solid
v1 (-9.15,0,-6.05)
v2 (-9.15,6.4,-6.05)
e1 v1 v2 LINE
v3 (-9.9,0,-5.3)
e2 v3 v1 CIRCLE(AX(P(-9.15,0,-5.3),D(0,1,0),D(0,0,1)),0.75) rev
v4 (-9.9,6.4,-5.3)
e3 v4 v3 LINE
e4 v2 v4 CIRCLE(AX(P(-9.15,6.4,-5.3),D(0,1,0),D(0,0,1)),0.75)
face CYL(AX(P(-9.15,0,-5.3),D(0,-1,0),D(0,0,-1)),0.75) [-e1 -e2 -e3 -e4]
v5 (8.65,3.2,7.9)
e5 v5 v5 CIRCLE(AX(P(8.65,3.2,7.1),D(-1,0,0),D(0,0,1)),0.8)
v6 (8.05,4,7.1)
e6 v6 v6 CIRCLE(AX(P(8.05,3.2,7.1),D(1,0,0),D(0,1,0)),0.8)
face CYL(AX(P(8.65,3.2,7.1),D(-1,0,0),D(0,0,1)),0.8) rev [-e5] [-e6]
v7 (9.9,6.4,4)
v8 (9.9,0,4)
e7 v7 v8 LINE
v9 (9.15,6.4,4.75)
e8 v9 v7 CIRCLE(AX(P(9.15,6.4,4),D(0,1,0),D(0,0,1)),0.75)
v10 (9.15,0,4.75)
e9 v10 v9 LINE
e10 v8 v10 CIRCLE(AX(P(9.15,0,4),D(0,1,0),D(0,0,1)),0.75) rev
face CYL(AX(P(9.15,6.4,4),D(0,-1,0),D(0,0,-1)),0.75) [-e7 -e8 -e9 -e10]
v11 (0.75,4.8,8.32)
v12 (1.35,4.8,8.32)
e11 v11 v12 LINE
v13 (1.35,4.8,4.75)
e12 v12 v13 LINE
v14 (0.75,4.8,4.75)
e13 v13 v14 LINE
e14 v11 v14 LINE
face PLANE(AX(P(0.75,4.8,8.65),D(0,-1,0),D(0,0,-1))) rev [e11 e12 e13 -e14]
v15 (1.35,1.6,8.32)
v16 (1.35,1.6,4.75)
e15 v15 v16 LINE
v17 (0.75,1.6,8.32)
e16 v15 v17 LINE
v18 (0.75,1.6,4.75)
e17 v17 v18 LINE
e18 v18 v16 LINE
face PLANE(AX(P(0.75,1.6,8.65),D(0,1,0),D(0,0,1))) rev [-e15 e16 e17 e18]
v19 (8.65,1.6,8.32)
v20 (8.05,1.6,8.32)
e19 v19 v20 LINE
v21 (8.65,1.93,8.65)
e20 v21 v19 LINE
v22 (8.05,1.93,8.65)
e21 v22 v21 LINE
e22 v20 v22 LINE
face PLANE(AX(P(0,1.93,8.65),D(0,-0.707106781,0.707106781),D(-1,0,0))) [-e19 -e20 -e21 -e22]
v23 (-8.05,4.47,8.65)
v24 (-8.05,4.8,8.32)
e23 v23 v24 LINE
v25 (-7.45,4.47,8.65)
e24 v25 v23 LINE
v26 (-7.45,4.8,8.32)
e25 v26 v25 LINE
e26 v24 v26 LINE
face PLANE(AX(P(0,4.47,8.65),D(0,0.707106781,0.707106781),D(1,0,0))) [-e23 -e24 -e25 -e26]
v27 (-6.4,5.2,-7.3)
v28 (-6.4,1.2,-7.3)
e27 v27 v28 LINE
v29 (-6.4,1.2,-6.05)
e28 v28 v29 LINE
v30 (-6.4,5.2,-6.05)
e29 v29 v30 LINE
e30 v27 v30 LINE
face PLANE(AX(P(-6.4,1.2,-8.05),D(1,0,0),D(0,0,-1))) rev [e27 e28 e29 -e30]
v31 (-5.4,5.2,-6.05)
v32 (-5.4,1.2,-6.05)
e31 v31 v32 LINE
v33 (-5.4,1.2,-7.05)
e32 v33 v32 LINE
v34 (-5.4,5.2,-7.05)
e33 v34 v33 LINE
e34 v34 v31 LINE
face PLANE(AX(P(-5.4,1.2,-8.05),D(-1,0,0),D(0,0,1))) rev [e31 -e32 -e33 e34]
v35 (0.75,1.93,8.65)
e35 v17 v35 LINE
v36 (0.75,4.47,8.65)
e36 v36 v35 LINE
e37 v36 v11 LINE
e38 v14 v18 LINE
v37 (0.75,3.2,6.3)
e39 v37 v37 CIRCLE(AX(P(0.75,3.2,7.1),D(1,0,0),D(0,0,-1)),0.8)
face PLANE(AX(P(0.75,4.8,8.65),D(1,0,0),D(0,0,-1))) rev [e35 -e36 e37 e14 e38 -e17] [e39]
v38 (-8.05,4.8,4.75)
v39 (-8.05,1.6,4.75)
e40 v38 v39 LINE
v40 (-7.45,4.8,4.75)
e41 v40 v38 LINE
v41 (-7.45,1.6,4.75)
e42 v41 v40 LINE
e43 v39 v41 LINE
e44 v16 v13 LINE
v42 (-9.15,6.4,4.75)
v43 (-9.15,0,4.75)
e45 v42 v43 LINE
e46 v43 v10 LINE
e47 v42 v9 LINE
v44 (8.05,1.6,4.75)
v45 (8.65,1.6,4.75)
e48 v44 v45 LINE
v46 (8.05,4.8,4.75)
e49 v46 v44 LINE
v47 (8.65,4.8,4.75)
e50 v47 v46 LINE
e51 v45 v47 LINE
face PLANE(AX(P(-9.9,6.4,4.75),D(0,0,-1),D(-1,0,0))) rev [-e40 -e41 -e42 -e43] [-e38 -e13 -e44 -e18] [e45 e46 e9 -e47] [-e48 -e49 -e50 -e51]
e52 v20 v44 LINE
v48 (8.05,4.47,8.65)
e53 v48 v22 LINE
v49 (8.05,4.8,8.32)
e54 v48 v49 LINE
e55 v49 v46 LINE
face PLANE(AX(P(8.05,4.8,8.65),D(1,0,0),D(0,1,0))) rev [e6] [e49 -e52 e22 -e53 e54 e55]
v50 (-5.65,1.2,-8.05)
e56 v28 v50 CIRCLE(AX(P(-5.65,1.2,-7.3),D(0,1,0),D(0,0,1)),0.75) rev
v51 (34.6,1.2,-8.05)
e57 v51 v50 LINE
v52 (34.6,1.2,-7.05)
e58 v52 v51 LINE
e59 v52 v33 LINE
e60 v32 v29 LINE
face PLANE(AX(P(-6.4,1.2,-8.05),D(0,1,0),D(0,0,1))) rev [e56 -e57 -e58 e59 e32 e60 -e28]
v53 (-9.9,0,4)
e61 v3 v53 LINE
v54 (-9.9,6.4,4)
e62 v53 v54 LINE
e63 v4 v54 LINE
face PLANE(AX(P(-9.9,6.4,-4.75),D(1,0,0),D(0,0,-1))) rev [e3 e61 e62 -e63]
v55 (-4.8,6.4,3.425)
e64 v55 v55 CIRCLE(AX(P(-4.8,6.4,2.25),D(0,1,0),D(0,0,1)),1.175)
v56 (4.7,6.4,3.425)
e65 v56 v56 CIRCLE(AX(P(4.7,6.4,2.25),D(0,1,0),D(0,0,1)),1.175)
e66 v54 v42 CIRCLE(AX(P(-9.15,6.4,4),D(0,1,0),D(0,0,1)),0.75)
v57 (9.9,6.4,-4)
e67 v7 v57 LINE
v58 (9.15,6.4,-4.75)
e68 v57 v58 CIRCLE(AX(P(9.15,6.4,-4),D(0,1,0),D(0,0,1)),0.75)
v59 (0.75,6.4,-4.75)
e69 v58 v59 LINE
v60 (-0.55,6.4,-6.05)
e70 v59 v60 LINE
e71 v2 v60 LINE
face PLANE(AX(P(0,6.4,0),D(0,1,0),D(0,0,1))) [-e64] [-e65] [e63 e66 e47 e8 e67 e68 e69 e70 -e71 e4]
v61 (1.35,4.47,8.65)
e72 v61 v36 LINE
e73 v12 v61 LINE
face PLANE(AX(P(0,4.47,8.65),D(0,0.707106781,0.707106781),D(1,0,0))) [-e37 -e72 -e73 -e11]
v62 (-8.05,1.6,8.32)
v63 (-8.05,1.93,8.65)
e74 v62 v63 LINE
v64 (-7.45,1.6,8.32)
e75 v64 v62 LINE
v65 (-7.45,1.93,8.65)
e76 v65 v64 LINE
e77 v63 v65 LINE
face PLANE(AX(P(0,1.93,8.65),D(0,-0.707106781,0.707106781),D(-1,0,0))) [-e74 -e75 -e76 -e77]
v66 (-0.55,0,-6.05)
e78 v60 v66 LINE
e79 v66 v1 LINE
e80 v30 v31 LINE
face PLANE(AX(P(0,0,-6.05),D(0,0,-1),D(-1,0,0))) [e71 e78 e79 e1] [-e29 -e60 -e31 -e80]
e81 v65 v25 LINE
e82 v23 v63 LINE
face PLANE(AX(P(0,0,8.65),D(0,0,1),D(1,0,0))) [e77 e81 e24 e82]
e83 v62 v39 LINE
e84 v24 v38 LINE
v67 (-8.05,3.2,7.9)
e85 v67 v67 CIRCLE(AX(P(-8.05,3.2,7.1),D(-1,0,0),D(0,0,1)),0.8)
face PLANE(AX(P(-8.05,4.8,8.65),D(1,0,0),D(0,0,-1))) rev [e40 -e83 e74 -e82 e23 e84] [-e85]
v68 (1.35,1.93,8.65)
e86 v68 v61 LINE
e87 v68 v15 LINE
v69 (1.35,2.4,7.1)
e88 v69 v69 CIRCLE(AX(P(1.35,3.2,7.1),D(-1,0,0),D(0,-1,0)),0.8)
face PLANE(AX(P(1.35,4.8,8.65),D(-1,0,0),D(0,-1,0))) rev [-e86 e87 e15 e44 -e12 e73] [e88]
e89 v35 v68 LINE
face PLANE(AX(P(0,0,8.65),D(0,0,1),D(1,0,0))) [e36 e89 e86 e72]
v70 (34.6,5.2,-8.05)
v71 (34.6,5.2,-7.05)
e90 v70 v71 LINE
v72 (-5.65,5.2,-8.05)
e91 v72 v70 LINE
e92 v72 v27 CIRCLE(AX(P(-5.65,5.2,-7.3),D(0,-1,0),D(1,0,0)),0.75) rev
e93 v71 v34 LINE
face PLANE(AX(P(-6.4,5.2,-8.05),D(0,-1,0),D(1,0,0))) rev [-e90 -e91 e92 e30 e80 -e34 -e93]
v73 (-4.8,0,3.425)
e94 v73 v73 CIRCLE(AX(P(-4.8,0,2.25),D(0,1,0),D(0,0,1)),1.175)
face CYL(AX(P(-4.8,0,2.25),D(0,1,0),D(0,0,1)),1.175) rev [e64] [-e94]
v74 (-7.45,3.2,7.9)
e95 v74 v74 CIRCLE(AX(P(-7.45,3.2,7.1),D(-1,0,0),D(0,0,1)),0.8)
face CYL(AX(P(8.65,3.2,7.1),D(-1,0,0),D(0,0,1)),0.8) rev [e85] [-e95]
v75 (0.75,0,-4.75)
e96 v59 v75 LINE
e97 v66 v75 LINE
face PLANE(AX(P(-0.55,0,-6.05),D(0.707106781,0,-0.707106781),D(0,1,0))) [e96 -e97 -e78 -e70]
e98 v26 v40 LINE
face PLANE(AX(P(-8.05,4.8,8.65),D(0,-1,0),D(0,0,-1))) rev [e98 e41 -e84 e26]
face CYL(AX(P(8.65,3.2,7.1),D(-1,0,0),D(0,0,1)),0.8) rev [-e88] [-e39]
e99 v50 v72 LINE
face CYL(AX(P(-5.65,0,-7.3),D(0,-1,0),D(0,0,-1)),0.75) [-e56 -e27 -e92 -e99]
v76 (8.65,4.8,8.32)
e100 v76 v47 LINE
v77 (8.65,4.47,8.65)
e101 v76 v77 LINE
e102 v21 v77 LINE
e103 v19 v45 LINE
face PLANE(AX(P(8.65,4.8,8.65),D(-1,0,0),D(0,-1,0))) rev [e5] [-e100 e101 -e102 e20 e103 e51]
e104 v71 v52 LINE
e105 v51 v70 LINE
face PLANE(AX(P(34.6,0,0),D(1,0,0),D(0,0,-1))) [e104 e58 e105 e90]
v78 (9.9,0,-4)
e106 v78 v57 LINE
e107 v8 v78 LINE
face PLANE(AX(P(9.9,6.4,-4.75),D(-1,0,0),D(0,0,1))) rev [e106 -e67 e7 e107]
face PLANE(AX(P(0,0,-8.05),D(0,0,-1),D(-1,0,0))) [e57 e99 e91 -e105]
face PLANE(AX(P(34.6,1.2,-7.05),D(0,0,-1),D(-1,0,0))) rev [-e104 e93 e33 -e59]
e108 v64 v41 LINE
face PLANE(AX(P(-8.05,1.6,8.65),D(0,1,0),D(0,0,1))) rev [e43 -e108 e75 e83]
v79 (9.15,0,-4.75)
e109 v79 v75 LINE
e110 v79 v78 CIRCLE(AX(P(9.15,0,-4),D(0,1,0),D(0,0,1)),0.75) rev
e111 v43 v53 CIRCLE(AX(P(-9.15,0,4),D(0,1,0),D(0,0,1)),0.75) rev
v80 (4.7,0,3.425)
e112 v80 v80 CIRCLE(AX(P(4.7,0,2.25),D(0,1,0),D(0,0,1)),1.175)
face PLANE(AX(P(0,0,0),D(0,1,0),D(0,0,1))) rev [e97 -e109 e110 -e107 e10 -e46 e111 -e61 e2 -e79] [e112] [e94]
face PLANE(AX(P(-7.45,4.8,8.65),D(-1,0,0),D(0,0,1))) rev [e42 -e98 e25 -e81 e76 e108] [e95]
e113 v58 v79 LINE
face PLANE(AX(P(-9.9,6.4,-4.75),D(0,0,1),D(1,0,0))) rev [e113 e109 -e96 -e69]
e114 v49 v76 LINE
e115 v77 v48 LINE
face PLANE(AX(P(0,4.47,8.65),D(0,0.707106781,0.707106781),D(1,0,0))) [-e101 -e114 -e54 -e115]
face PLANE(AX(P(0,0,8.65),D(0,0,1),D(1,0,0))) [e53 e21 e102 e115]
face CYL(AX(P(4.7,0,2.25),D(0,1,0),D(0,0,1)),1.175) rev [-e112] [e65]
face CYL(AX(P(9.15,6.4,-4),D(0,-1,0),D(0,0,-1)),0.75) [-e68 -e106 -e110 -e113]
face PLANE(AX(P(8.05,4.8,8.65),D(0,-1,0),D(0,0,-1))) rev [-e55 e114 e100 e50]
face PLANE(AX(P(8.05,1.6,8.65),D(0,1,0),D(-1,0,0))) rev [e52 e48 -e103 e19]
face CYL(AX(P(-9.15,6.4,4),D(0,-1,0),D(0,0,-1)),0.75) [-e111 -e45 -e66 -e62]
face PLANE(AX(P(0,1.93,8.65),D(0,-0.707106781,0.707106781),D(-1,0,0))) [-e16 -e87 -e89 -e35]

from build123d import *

# Parameters (mm, degrees)
SKETCH1_W           = 19.8
SKETCH1_H           = 9.5
BOSS_EXTRUDE1_DEPTH = 6.4
SKETCH2_W           = 10.65
SKETCH2_H           = 6.4
BOSS_EXTRUDE2_DEPTH = 1.3
CHAMFER3_SIZE       = 1.3
FILLET1_R           = 0.75
SKETCH3_W           = 1
SKETCH3_H           = 4
BOSS_EXTRUDE3_DEPTH = 2
SKETCH4_W           = 1
SKETCH4_H           = 4
BOSS_EXTRUDE4_DEPTH = 40
FILLET2_R           = 0.75
SKETCH5_R           = 1.175
CUT_EXTRUDE1_DEPTH  = 6.4
SKETCH6_W           = 0.6
SKETCH6_H           = 3.2
BOSS_EXTRUDE5_DEPTH = 3.9
SKETCH8_R           = 0.8
CUT_EXTRUDE2_DEPTH  = 16.7
CHAMFER4_SIZE       = 0.33


with BuildPart() as part:
    # Sketch1 → Boss-Extrude1 (new body)
    with BuildSketch(Plane(origin=(0, 0, 0), x_dir=(1, 0, 0), z_dir=(0, 1, 0))):
        Rectangle(SKETCH1_W, SKETCH1_H)
    extrude(amount=BOSS_EXTRUDE1_DEPTH)

    # Sketch2 → Boss-Extrude2 (add)
    with BuildSketch(Plane(origin=(0, 0, -4.75), x_dir=(-1, 0, 0), z_dir=(0, 0, -1))):
        with Locations((4.575, 3.2)):
            Rectangle(SKETCH2_W, SKETCH2_H)
    extrude(amount=BOSS_EXTRUDE2_DEPTH)

    # Chamfer3
    chamfer3_edges = [part.edges().sort_by_distance(p)[0] for p in [
        (0.75, 3.2, -6.05),
    ]]
    chamfer(chamfer3_edges, length=CHAMFER3_SIZE - 0.0001)  # a hair under: the kernel refuses the full size

    # Fillet1
    fillet1_edges = [part.edges().sort_by_distance(p)[0] for p in [
        (-9.9, 3.2, -6.05),
        (9.9, 3.2, 4.75),
        (-9.9, 3.2, 4.75),
        (9.9, 3.2, -4.75),
    ]]
    fillet(fillet1_edges, radius=FILLET1_R)

    # Sketch3 → Boss-Extrude3 (add)
    with BuildSketch(Plane(origin=(0, 0, -6.05), x_dir=(-1, 0, 0), z_dir=(0, 0, -1))):
        with Locations((5.9, 3.2)):
            Rectangle(SKETCH3_W, SKETCH3_H)
    extrude(amount=BOSS_EXTRUDE3_DEPTH)

    # Sketch4 → Boss-Extrude4 (add)
    with BuildSketch(Plane(origin=(-5.4, 0, 0), x_dir=(0, 0, -1), z_dir=(1, 0, 0))):
        with Locations((7.55, 3.2)):
            Rectangle(SKETCH4_W, SKETCH4_H)
    extrude(amount=BOSS_EXTRUDE4_DEPTH)

    # Fillet2
    fillet2_edges = [part.edges().sort_by_distance(p)[0] for p in [
        (-6.4, 3.2, -8.05),
    ]]
    fillet(fillet2_edges, radius=FILLET2_R)

    # Sketch5 → Cut-Extrude1 (cut)
    with BuildSketch(Plane(origin=(0, 6.4, 0), x_dir=(1, 0, 0), z_dir=(0, 1, 0))):
        with Locations(Location((-4.8, -2.25, 0), (0, 0, 270))):
            Circle(SKETCH5_R)
        with Locations(Location((4.7, -2.25, 0), (0, 0, 270))):
            Circle(SKETCH5_R)
    extrude(amount=-CUT_EXTRUDE1_DEPTH, mode=Mode.SUBTRACT)

    # Sketch6 → Boss-Extrude5 (add)
    with BuildSketch(Plane.XY.offset(4.75)):
        with Locations((-7.75, 3.2)):
            Rectangle(SKETCH6_W, SKETCH6_H)
        with Locations((1.05, 3.2)):
            Rectangle(SKETCH6_W, SKETCH6_H)
        with Locations((8.35, 3.2)):
            Rectangle(SKETCH6_W, SKETCH6_H)
    extrude(amount=BOSS_EXTRUDE5_DEPTH)

    # Sketch8 → Cut-Extrude2 (cut)
    with BuildSketch(Plane.ZY.offset(8.05)):
        with Locations((7.1, 3.2)):
            Circle(SKETCH8_R)
    extrude(amount=-CUT_EXTRUDE2_DEPTH, mode=Mode.SUBTRACT)

    # Chamfer4
    chamfer4_edges = [part.edges().sort_by_distance(p)[0] for p in [
        (-7.75, 1.6, 8.65),
        (-7.75, 4.8, 8.65),
        (1.05, 1.6, 8.65),
        (1.05, 4.8, 8.65),
        (8.35, 1.6, 8.65),
        (8.35, 4.8, 8.65),
    ]]
    chamfer(chamfer4_edges, length=CHAMFER4_SIZE)


solid = part.part
